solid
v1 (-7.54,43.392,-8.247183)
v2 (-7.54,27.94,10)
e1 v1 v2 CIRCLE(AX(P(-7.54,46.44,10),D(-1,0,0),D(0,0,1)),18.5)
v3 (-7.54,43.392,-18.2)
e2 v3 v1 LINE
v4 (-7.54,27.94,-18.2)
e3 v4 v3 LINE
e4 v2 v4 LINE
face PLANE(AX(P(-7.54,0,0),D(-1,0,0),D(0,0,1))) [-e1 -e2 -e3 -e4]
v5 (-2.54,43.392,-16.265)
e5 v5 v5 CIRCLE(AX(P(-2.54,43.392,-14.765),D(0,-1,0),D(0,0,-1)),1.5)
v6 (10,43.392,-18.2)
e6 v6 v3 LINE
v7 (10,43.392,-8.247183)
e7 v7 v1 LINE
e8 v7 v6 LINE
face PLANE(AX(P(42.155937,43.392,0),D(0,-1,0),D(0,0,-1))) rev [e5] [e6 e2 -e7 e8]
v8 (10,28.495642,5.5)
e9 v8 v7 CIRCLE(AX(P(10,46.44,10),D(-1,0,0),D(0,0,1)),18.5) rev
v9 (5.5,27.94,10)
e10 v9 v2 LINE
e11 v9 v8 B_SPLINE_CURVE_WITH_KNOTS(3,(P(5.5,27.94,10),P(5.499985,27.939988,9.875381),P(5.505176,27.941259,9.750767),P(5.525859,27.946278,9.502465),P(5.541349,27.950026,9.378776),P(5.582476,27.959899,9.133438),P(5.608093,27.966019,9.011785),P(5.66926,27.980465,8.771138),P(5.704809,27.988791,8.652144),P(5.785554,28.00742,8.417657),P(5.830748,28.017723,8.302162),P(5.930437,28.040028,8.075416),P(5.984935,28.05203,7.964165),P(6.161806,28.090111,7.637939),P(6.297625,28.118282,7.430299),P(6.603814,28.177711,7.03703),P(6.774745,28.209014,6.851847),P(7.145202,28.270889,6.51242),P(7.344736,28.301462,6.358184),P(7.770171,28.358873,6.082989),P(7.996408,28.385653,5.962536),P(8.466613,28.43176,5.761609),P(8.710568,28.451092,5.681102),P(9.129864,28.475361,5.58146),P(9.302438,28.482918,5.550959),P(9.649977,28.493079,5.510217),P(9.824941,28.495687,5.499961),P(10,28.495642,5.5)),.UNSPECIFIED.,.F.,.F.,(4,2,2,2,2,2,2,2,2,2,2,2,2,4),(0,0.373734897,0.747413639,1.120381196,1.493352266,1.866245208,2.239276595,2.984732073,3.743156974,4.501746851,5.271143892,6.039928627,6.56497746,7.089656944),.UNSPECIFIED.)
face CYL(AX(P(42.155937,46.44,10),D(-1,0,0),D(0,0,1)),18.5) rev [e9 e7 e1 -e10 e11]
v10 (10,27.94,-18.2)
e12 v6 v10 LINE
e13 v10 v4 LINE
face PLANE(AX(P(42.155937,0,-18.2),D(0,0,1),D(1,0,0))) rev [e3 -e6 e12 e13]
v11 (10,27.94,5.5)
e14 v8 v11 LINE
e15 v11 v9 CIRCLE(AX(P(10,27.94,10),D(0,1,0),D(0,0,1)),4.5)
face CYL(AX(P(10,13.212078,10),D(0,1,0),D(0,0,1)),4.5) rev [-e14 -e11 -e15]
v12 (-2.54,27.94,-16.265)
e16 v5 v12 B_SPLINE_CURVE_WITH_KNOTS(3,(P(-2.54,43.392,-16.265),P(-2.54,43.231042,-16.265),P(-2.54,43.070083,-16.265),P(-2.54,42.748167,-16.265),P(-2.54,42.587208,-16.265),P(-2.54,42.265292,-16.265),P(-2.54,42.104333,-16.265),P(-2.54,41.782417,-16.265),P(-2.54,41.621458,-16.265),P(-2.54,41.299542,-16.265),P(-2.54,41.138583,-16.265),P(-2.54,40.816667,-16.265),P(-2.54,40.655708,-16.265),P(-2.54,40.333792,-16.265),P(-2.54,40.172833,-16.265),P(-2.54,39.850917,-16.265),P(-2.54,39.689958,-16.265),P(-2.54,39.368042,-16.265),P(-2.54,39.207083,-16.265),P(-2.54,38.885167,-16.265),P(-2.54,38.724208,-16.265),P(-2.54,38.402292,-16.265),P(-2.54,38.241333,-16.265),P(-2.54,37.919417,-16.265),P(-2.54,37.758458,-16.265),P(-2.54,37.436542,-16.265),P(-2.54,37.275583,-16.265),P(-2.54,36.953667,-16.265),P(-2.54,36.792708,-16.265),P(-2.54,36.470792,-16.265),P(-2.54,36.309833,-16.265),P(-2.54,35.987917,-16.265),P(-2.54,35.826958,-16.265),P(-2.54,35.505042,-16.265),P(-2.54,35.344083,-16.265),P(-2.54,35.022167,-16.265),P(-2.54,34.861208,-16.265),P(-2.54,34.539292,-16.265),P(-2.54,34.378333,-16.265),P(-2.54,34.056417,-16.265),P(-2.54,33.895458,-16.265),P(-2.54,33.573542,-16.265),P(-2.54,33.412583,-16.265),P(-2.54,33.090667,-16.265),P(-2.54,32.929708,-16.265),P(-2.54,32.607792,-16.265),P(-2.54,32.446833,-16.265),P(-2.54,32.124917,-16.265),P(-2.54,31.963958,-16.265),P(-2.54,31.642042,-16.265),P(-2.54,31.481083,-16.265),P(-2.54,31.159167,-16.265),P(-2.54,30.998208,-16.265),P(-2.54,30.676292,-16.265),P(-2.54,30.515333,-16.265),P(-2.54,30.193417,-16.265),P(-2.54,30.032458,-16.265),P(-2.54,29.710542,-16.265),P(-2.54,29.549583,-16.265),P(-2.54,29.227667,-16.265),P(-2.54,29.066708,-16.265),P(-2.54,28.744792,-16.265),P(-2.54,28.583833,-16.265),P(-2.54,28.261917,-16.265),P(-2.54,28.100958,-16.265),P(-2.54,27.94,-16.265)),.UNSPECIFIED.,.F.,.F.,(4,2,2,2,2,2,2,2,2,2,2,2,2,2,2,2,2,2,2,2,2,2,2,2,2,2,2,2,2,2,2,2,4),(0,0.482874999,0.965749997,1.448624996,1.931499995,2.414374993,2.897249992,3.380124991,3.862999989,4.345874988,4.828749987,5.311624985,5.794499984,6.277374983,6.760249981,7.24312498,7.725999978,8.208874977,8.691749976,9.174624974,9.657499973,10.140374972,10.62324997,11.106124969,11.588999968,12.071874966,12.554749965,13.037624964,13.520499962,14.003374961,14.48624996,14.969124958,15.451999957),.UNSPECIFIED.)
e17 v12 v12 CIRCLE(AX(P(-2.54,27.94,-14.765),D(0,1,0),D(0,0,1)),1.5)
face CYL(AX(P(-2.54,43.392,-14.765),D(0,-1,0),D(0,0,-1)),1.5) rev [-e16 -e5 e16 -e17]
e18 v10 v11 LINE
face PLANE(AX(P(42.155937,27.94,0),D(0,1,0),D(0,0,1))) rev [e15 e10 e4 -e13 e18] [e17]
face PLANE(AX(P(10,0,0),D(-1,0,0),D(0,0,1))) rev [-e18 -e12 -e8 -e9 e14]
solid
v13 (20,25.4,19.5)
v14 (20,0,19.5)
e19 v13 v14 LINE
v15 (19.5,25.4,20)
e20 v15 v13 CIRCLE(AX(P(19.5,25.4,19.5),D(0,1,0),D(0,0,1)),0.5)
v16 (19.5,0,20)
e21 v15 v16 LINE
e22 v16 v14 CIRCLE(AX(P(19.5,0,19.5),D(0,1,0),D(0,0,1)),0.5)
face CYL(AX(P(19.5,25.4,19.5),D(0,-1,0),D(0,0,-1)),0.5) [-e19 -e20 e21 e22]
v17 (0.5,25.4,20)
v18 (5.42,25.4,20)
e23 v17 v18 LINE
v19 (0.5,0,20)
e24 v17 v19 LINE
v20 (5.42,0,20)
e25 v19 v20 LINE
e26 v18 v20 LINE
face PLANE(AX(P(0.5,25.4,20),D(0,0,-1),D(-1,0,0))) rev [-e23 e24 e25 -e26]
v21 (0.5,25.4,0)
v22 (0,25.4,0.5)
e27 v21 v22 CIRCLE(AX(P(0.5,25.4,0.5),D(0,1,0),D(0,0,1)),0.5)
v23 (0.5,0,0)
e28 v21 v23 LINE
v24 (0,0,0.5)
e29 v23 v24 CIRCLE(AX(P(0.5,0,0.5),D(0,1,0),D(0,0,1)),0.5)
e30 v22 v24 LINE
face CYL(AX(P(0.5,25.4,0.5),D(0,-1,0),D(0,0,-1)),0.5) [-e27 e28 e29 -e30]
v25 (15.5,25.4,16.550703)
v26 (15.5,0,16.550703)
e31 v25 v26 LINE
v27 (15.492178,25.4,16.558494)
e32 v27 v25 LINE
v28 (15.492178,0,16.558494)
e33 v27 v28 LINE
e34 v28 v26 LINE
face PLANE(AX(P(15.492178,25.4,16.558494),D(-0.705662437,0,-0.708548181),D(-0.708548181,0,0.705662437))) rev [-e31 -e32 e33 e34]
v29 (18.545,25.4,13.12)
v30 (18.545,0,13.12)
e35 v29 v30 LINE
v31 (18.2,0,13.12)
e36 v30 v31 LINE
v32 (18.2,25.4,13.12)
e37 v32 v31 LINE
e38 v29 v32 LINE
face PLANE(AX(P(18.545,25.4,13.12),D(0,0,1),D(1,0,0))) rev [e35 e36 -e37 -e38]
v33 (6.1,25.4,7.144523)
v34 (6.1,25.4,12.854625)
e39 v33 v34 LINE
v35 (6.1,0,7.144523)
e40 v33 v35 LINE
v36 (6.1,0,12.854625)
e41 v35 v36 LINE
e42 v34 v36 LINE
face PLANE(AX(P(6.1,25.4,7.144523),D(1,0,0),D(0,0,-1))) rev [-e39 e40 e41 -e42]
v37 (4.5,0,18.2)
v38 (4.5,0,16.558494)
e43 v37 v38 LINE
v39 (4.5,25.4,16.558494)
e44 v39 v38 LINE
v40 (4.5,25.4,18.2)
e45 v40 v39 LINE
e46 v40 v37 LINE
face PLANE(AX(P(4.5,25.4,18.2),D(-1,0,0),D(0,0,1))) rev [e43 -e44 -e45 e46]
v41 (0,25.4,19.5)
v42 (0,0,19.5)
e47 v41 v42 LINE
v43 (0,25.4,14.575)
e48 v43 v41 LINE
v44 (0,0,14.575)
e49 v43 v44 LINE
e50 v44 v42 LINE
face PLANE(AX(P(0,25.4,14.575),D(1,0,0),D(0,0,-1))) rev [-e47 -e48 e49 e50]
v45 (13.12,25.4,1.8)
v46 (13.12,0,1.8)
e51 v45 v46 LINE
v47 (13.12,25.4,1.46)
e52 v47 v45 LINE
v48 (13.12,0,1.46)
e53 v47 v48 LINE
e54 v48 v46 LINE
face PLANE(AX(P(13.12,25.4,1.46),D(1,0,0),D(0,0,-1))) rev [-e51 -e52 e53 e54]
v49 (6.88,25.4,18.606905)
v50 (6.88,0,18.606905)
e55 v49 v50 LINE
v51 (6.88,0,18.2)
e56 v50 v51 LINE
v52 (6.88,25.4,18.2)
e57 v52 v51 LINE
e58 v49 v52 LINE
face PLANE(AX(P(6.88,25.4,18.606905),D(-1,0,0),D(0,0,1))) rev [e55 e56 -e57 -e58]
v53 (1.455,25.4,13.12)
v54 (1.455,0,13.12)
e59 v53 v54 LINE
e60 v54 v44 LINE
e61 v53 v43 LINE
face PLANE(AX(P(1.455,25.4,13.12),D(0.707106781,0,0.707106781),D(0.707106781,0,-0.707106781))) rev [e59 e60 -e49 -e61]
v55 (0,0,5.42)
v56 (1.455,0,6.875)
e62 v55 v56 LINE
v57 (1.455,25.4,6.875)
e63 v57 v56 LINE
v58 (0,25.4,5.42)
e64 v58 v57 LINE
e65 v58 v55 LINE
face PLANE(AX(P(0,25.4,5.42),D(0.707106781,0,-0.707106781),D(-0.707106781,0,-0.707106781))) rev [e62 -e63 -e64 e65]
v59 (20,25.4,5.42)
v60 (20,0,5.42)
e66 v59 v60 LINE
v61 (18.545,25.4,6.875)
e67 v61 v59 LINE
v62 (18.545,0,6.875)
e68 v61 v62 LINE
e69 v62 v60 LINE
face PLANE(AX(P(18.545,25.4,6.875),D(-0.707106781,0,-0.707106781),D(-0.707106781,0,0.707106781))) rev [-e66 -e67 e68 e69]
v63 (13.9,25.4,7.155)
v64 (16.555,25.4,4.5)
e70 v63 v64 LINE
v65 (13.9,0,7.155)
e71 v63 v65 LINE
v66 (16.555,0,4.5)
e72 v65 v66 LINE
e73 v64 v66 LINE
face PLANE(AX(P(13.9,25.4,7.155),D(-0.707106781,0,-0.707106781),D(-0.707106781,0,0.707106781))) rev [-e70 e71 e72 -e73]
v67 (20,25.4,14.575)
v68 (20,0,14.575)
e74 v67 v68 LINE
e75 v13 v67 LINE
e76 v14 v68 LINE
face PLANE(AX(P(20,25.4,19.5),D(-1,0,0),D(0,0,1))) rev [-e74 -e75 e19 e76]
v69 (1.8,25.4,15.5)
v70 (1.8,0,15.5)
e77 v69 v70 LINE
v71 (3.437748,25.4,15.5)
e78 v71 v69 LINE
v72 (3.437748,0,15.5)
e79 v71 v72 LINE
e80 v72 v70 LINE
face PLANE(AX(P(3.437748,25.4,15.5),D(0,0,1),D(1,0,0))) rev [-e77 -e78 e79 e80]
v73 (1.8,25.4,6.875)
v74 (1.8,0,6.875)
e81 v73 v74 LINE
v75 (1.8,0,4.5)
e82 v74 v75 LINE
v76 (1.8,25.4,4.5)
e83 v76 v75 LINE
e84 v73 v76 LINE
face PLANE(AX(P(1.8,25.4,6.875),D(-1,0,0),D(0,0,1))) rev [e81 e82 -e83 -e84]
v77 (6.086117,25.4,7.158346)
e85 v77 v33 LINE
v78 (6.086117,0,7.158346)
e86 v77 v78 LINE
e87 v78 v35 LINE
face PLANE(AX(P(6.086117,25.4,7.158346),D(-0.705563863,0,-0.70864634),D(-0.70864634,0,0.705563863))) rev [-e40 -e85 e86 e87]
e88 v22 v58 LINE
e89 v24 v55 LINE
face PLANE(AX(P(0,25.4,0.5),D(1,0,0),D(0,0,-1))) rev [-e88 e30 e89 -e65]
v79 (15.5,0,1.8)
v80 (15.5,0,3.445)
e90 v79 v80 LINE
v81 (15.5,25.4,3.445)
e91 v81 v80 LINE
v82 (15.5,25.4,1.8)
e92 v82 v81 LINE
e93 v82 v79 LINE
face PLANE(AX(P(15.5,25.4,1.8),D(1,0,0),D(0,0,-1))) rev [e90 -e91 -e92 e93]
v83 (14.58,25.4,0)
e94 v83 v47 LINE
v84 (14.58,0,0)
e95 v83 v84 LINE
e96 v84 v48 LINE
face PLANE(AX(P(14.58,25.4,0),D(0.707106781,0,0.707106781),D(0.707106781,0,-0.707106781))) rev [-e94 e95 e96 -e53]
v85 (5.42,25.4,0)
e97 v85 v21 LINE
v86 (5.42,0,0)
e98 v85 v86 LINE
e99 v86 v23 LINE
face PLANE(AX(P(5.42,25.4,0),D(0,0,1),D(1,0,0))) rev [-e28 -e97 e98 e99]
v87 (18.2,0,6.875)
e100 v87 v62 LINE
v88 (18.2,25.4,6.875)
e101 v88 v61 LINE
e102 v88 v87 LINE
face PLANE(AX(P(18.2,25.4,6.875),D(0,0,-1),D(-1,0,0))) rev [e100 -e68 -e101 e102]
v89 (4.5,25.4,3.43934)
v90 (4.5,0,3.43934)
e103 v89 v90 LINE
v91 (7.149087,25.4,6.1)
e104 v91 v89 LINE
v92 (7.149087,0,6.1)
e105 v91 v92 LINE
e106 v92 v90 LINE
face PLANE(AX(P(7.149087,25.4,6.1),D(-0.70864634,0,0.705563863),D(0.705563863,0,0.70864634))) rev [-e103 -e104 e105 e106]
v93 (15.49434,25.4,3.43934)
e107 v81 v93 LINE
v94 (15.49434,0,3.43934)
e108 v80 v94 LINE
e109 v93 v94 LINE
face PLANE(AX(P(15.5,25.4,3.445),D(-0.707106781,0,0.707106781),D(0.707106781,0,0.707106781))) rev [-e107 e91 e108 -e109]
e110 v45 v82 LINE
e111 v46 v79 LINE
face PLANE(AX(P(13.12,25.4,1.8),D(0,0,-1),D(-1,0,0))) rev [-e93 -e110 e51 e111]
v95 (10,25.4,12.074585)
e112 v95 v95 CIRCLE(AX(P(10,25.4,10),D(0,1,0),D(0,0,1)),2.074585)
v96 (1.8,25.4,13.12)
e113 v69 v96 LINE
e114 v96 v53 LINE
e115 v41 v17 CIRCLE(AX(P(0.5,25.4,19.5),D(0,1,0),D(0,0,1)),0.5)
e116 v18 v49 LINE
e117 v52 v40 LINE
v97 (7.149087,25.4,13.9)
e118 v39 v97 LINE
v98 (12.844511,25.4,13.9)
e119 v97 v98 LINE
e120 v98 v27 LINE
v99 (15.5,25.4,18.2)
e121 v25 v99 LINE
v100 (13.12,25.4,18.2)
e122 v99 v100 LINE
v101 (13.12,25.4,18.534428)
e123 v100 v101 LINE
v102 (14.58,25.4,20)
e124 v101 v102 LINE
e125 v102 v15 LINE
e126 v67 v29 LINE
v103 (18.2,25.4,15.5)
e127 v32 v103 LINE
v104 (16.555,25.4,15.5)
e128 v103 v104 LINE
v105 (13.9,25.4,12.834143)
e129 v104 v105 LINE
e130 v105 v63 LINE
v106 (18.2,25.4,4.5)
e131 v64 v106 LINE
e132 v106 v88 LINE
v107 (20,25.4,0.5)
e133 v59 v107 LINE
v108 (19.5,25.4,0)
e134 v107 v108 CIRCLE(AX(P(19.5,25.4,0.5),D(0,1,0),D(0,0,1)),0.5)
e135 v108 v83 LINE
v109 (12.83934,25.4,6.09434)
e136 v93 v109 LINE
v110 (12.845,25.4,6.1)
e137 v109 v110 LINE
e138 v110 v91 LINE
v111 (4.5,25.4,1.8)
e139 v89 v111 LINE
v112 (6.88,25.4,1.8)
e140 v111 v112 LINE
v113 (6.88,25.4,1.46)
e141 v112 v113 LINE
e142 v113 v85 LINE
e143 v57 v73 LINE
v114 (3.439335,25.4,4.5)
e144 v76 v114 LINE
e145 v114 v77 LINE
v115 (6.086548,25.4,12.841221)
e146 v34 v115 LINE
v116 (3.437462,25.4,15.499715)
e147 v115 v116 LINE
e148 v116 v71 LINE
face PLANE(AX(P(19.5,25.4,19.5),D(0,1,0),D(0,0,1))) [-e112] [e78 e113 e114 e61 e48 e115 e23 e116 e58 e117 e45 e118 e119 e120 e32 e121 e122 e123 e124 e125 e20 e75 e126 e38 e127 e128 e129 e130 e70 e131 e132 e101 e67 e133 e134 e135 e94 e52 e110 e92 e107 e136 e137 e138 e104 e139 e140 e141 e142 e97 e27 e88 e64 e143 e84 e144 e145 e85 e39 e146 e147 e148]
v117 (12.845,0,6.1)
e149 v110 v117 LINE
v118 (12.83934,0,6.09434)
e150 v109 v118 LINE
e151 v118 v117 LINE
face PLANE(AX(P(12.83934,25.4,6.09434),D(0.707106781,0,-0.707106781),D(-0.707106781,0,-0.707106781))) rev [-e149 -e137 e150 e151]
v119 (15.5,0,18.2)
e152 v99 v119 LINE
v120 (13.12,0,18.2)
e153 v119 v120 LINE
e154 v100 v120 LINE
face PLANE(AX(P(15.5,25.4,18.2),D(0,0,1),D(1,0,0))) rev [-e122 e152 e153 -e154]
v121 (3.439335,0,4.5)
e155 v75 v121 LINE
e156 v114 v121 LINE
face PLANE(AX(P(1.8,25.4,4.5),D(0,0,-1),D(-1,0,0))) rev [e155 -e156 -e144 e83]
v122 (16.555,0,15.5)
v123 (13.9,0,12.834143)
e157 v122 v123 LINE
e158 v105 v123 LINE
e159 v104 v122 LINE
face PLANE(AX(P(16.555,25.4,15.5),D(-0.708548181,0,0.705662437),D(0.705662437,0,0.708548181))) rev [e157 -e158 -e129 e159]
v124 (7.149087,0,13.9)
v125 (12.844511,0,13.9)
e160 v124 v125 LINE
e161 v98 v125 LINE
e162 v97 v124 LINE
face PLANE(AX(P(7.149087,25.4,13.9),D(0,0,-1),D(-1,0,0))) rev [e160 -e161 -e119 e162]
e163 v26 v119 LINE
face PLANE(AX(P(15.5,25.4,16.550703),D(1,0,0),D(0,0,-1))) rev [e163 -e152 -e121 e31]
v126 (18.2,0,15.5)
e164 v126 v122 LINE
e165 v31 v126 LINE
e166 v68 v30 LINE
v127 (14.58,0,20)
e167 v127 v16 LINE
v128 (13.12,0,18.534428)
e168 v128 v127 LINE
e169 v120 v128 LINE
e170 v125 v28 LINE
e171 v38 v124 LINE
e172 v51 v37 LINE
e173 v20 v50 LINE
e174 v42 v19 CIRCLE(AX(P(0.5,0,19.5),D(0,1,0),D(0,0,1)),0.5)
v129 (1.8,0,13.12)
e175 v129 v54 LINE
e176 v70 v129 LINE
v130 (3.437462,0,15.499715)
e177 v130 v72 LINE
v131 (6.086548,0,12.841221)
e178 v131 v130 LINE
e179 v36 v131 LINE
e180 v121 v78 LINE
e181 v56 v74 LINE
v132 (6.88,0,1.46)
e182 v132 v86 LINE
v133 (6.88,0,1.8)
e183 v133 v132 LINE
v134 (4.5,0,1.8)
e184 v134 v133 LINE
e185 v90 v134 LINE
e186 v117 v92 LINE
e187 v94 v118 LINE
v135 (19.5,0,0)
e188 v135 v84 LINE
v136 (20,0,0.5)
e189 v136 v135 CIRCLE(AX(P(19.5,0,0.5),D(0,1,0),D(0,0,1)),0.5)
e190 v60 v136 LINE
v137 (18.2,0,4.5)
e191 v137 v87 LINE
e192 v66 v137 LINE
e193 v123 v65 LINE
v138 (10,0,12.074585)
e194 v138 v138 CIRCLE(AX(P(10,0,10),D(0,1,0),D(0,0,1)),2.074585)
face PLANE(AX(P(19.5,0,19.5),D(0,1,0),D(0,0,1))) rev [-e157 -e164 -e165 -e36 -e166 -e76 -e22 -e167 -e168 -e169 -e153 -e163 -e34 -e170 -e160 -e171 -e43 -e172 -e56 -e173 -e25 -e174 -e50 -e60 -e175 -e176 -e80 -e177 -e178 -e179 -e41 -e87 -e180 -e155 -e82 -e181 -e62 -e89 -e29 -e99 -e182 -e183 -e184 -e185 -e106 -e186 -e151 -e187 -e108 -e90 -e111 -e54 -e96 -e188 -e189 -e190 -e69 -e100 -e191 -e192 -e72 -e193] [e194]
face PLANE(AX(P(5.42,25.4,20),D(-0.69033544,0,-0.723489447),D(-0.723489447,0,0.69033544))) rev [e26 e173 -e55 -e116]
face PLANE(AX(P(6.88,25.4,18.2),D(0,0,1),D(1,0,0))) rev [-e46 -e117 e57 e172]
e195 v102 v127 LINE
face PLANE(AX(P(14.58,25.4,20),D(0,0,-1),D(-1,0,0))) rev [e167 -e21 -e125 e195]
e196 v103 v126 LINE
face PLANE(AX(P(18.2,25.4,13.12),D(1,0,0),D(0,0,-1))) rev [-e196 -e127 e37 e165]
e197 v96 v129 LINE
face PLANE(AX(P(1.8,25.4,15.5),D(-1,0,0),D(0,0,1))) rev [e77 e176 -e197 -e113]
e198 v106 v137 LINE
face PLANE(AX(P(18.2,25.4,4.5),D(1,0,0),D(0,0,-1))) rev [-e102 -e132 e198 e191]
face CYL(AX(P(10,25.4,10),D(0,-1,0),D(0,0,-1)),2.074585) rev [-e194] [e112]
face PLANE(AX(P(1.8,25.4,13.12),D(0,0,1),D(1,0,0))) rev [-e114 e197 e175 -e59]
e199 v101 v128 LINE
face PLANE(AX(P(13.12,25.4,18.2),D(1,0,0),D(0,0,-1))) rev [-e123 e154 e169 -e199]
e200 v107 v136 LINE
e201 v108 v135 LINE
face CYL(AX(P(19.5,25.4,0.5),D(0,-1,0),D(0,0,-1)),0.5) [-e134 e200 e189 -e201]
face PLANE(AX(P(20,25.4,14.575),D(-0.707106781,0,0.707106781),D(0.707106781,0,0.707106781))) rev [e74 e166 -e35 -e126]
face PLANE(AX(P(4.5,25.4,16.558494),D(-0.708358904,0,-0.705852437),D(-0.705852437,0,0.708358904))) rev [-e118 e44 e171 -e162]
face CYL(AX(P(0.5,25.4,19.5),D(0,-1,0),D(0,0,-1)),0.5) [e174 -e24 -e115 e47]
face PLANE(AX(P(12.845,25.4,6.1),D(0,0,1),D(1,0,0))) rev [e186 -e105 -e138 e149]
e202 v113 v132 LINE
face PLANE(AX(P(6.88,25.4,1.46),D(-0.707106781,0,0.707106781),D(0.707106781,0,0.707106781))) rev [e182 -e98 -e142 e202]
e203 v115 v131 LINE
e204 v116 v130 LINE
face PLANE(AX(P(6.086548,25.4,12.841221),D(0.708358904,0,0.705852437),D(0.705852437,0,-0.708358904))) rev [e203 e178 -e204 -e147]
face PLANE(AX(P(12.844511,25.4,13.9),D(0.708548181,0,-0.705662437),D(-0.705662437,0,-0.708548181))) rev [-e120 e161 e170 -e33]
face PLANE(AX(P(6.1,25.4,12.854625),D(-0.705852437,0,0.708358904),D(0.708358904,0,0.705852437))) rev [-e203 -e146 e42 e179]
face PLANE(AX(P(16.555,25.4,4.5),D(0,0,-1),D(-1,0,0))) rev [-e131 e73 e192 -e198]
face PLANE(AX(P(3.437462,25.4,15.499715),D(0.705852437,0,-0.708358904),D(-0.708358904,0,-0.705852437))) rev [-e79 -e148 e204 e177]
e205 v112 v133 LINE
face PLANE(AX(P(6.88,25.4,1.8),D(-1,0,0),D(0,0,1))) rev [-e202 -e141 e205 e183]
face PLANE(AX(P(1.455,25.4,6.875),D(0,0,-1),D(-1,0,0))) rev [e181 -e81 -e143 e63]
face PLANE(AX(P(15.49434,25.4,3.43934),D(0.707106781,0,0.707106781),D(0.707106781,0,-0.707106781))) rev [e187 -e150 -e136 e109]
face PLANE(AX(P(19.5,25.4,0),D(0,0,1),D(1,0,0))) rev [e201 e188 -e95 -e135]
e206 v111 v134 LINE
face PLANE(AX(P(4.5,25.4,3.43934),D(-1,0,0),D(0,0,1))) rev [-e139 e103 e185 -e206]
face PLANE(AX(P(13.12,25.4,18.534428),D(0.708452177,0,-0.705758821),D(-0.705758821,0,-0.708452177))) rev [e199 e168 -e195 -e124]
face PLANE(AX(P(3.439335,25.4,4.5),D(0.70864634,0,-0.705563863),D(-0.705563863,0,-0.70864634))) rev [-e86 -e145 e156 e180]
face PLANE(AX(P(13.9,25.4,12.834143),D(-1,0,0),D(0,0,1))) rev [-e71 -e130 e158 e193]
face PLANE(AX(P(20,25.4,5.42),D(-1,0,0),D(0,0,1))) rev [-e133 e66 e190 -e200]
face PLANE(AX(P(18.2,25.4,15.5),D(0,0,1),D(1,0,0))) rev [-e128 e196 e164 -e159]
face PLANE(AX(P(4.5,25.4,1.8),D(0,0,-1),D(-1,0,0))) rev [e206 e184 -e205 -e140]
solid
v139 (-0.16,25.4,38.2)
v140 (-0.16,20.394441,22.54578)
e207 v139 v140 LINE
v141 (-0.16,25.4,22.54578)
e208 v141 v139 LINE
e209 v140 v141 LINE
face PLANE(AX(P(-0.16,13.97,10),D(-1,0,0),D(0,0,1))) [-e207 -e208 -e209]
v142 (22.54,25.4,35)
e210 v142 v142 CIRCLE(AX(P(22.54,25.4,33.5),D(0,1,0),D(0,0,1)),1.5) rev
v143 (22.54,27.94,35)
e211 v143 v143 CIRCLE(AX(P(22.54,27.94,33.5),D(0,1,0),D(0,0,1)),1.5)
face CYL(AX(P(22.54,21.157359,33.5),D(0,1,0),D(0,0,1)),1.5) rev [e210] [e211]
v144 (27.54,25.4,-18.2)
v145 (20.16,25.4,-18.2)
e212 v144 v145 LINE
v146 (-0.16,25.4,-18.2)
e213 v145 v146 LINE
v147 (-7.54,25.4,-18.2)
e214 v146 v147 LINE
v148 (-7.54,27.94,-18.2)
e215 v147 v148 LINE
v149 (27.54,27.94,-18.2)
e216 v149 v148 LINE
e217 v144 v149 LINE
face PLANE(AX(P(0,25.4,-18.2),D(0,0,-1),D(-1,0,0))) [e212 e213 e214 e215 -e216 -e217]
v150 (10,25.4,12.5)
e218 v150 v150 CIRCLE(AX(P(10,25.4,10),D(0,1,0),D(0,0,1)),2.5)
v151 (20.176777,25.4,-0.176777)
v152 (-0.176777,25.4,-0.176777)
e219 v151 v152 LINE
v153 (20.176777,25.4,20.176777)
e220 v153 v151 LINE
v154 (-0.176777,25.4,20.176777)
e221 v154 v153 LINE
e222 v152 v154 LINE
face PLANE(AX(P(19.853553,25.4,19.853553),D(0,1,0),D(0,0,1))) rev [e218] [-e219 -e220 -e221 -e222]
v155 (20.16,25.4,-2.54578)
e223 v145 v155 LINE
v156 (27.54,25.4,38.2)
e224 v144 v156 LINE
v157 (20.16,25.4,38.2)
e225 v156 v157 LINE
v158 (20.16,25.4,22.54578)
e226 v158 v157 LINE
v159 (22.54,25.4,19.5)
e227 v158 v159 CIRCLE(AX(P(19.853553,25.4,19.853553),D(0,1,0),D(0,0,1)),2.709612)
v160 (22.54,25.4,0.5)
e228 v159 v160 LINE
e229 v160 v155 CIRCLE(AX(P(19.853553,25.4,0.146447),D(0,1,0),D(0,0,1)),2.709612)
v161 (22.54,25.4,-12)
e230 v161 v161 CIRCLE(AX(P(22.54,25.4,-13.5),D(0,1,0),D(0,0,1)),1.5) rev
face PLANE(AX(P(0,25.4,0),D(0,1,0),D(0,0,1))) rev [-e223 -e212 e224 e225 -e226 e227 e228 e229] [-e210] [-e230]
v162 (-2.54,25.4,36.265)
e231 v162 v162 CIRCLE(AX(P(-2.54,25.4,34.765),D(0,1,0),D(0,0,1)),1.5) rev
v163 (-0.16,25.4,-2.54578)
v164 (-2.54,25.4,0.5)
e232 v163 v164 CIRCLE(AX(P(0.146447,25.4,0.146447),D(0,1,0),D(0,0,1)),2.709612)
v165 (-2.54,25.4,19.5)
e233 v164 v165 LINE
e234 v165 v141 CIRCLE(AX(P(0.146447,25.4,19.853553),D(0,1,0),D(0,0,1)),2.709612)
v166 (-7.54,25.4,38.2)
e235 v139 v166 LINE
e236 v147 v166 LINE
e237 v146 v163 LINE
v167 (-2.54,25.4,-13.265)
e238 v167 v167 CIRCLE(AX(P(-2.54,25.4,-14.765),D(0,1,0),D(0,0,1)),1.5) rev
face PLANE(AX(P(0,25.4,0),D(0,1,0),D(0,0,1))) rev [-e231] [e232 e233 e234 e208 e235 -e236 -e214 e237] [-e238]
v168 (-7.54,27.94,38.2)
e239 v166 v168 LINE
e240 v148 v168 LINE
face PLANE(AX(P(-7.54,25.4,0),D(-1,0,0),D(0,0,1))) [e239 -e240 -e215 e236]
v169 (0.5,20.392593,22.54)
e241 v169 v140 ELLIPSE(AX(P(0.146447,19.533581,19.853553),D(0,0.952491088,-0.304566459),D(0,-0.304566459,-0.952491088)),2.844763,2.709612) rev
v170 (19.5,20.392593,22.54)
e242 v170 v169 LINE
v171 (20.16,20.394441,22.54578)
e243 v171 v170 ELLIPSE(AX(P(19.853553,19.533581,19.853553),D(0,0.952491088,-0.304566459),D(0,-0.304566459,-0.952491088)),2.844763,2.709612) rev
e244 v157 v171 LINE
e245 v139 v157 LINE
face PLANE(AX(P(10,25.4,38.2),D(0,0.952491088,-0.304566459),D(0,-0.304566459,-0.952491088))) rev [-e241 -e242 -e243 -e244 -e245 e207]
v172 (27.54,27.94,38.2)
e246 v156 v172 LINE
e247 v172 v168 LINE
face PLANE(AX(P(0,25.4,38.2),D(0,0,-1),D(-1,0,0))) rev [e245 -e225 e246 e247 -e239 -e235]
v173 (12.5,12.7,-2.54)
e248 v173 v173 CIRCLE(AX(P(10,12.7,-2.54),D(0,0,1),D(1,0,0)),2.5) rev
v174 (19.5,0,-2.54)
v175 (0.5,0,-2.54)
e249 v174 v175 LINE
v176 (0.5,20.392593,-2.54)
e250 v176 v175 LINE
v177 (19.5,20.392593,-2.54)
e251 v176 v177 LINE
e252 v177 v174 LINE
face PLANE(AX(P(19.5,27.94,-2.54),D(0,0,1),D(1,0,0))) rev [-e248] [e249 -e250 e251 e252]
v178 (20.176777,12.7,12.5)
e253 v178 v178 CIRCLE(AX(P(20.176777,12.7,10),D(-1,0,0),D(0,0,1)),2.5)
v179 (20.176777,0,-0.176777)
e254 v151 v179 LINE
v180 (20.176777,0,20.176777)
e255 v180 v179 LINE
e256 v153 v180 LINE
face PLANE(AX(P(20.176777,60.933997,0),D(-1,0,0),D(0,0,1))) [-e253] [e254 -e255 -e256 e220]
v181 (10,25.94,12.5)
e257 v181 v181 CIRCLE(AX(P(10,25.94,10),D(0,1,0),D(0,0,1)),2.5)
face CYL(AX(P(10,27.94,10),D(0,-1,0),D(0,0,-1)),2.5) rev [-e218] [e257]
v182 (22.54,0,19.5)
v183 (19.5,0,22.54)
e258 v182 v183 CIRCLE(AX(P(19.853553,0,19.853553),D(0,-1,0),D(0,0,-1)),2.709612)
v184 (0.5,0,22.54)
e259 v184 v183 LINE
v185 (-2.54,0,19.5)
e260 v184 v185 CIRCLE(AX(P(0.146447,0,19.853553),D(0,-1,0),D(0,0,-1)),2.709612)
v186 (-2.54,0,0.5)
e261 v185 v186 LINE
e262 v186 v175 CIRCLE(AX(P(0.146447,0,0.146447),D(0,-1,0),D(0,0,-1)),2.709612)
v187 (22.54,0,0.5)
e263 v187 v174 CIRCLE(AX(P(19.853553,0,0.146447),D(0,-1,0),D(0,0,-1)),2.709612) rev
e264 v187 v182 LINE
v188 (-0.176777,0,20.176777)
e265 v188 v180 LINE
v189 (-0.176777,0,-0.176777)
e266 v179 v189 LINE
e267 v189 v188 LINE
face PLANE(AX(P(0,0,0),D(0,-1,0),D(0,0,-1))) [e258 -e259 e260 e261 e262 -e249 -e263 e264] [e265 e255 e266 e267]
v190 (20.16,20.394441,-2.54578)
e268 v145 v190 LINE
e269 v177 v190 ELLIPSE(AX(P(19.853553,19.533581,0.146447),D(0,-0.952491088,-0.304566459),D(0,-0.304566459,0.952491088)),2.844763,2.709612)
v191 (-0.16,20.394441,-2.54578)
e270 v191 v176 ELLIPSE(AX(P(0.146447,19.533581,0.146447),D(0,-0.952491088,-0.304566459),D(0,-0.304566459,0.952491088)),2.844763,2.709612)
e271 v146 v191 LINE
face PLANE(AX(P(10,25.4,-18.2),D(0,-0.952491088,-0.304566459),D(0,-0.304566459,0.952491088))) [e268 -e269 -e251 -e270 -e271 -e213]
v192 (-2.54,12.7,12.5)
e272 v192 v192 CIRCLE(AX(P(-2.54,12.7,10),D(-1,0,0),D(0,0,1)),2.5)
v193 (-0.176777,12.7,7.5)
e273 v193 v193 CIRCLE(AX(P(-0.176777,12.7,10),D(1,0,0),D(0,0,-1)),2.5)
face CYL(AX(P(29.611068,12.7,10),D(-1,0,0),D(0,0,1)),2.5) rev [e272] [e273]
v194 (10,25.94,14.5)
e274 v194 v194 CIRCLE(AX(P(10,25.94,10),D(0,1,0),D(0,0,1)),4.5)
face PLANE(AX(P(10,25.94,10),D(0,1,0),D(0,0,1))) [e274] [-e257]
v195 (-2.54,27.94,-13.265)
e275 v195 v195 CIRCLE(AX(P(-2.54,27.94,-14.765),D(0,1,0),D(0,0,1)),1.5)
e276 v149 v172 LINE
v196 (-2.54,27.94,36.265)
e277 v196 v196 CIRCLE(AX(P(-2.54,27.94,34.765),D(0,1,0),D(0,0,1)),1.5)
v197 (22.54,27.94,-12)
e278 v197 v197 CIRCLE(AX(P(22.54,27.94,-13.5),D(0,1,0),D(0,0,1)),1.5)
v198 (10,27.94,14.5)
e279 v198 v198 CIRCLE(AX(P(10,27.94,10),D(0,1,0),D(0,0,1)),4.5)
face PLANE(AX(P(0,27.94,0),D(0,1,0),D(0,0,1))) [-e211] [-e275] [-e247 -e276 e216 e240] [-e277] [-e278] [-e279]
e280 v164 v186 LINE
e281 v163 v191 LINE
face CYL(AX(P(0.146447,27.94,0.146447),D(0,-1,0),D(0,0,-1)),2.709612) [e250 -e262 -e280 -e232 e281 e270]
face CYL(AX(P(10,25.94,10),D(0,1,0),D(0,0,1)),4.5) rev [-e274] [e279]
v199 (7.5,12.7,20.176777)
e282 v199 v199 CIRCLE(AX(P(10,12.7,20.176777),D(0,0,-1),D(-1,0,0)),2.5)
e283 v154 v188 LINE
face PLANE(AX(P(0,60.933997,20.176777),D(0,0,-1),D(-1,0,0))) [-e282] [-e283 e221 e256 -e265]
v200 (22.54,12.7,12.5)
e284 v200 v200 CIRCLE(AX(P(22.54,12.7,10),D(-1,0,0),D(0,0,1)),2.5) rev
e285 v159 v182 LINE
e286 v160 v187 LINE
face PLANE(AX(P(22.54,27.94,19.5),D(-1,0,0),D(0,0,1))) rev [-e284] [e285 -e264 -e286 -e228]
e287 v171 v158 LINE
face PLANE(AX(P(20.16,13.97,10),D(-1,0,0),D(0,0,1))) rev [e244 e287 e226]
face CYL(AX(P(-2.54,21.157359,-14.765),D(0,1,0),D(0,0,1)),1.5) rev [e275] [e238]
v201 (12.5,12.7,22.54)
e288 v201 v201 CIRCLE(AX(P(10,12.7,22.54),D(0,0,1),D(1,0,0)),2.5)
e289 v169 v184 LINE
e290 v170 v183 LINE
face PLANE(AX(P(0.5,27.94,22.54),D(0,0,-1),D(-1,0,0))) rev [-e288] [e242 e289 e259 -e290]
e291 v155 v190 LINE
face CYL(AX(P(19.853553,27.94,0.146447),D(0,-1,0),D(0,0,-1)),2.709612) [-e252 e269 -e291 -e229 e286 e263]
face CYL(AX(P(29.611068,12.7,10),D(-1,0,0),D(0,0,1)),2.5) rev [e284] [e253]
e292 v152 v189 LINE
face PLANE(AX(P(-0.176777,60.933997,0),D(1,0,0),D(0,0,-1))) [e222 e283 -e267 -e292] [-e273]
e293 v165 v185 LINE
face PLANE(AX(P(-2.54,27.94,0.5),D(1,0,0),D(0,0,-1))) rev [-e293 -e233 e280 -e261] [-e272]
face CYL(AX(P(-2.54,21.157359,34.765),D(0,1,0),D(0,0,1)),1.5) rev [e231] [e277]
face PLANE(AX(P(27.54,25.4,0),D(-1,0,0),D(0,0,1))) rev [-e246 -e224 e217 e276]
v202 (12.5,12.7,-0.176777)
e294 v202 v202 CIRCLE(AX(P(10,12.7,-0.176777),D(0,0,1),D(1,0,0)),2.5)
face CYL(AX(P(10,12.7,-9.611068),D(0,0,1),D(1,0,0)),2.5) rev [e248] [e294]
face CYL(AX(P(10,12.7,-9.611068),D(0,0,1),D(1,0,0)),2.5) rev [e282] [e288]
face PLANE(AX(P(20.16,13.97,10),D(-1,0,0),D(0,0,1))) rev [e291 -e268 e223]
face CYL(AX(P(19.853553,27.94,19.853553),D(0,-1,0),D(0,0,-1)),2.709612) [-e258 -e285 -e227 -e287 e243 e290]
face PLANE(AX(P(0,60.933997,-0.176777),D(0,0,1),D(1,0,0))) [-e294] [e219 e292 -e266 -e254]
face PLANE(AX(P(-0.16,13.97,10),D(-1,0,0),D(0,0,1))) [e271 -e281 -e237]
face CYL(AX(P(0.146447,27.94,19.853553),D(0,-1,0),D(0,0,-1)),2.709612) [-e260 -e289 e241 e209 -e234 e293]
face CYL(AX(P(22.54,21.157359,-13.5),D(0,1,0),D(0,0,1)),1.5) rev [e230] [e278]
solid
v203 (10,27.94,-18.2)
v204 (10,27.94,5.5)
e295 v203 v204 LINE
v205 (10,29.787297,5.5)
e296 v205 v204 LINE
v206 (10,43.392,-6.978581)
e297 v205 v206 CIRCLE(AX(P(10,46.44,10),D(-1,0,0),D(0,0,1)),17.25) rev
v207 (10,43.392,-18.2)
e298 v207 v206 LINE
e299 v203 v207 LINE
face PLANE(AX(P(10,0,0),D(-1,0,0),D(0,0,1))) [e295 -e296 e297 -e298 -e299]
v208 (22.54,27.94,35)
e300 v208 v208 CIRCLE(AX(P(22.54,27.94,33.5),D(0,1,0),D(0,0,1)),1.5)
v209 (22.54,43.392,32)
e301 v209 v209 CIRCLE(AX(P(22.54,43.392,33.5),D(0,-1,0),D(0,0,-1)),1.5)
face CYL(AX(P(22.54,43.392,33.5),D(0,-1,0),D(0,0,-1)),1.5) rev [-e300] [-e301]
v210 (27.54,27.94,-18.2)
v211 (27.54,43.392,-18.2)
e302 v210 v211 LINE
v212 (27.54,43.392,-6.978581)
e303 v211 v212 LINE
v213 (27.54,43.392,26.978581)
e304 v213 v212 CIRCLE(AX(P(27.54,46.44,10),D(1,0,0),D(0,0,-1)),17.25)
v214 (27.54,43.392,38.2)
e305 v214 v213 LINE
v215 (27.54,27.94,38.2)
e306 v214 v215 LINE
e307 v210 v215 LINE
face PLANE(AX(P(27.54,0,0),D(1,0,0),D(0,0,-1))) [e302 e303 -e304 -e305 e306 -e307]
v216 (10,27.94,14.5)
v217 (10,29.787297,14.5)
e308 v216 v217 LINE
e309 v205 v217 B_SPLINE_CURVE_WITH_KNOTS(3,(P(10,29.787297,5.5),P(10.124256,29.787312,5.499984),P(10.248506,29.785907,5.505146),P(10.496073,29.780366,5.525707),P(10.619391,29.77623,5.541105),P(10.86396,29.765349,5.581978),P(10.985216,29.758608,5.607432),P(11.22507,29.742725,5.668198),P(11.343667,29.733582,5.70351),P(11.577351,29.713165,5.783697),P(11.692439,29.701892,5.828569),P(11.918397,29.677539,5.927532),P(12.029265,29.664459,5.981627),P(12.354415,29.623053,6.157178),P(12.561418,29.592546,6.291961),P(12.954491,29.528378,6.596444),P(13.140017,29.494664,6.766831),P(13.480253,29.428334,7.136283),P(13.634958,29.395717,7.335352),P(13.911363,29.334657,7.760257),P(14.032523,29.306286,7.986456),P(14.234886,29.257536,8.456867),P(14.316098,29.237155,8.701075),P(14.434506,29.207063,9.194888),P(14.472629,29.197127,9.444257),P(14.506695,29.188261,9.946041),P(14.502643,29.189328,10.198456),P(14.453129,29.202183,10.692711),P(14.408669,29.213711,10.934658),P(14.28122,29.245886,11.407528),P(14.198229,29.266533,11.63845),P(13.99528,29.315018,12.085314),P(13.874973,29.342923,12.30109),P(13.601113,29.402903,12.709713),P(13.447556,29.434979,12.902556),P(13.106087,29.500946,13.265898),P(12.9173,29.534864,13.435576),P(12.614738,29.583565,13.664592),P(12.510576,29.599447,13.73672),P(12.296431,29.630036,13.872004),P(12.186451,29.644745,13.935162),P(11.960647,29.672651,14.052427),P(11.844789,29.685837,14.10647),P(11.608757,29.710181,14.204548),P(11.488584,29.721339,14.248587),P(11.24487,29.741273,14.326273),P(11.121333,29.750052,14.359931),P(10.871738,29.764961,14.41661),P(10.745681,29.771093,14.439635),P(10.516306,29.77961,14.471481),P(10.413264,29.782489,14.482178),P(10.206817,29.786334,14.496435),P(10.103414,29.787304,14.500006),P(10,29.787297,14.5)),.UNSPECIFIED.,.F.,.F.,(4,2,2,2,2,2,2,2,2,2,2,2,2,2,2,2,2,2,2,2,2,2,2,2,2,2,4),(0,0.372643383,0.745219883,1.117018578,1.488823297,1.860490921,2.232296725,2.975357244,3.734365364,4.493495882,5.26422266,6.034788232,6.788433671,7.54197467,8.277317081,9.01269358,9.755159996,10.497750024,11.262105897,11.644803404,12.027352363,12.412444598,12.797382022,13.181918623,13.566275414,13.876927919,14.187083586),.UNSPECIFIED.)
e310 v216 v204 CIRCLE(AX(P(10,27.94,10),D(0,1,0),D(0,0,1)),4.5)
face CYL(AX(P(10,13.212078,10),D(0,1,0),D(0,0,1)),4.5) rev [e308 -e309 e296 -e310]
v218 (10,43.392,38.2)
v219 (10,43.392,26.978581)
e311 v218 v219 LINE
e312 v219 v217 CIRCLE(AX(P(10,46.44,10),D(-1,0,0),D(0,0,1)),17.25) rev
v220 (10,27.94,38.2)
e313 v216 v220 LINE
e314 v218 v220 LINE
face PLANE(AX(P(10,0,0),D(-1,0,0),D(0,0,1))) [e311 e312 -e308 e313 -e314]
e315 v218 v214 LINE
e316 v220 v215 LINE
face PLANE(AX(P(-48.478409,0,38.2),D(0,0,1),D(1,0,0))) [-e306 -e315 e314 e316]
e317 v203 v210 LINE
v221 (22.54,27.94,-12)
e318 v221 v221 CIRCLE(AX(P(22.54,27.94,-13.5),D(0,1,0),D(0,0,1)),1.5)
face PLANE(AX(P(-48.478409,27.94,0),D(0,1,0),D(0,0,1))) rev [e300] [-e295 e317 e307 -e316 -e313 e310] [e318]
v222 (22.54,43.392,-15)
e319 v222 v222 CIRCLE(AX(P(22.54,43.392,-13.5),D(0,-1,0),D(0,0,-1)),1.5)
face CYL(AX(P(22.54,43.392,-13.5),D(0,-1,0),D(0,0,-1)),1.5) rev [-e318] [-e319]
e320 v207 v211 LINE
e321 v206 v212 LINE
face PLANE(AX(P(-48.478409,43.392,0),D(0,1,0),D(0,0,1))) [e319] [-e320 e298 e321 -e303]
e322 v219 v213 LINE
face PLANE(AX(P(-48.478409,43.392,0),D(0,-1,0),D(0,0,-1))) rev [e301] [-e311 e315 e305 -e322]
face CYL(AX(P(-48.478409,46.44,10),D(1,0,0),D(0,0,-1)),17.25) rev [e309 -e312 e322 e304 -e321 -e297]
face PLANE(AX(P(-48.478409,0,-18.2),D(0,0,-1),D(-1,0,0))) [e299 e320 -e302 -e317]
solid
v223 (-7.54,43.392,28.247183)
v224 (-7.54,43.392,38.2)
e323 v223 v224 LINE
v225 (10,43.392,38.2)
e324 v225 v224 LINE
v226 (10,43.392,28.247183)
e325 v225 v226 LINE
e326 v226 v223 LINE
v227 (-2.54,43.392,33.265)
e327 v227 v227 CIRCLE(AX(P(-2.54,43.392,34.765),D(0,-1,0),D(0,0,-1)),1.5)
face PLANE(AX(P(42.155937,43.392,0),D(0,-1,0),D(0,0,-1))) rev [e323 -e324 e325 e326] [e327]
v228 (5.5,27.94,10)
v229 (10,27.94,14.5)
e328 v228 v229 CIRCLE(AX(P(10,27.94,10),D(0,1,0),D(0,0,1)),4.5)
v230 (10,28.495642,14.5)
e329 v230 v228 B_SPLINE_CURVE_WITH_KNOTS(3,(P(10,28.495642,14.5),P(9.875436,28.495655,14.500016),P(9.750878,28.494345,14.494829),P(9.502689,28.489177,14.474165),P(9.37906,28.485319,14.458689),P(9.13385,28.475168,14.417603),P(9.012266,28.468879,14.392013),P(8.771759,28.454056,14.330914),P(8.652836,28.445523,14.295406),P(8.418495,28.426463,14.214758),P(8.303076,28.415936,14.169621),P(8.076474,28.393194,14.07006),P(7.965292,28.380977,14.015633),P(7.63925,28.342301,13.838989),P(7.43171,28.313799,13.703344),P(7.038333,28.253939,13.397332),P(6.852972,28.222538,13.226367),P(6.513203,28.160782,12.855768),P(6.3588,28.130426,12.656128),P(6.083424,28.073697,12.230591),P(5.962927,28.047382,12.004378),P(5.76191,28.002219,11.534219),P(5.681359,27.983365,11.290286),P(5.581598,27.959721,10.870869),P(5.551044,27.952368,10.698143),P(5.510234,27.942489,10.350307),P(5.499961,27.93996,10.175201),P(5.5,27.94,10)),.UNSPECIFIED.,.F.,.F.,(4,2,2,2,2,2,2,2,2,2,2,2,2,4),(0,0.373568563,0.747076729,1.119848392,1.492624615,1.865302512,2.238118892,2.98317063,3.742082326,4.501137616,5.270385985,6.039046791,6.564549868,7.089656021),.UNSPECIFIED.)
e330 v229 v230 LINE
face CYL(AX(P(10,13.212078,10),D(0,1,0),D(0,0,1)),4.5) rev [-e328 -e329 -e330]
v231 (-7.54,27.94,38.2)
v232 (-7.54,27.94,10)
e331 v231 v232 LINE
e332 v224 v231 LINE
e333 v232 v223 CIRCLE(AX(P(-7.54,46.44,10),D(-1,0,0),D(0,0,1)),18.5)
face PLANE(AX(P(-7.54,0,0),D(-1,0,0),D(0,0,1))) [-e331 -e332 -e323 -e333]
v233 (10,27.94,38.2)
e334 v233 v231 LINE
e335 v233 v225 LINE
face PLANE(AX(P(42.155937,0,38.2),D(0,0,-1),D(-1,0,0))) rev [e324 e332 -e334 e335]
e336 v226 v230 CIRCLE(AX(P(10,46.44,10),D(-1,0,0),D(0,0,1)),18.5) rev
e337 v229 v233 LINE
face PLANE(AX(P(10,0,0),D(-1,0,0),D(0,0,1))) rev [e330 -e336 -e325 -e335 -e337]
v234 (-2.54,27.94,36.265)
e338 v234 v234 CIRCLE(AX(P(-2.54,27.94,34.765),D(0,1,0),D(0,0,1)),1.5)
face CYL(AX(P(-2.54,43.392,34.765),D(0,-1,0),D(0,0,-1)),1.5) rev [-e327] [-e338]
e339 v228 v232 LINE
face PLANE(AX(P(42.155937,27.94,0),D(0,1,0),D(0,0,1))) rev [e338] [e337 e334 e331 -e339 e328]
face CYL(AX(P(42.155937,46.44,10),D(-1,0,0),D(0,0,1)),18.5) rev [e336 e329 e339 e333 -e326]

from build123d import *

# Parameters (mm, degrees)
SKETCH2_R               = 2.074585303
VSLOT2020_2020_5_DEPTH  = 25.4
BOSS_EXTRUDE1_START     = -25.4
SKETCH3_W               = 20.35355339
SKETCH3_H               = 20.35355339
BOSS_EXTRUDE1_DEPTH     = 25.4
CUT_EXTRUDE1_REACH      = 44.242
SKETCH5_R               = 2.5
SKETCH10_R              = 2.5
BOSS_EXTRUDE2_DEPTH     = 2.54
BOSS_EXTRUDE3_DEPTH     = 2.54
RIB22_REACH             = 52.473
SKETCH15_WALL_W         = 119.363005456
SKETCH15_WALL_H         = 20.32
SKETCH16_R              = 1.5
CUT_EXTRUDE3_DEPTH      = 2.54
SKETCH17_R              = 4.5
CUT_EXTRUDE4_DEPTH      = 2
CUT_EXTRUDE2_REACH      = 58.078
BOSS_EXTRUDE6_DEPTH     = 17.54
BOSS_EXTRUDE6_2_DEPTH   = 17.54
BOSS_EXTRUDE7_DEPTH     = 17.54
CUT_EXTRUDE7_DEPTH      = 54.505622126
CUT_EXTRUDE7_DEPTH_BACK = 54.505622126
SKETCH27_R              = 2.5
SKETCH27_R_2            = 1.5
CUT_EXTRUDE8_DEPTH      = 65.035593734
CUT_EXTRUDE8_DEPTH_BACK = 17.452
SKETCH28_R              = 4.5


with BuildPart() as part:
    # Sketch2 → Vslot2020 2020(5) (new body)
    with BuildSketch(Plane.ZX):
        with BuildLine():
            Line((13.9, 7.149086807), (13.9, 12.844511469))
            Line((13.9, 12.844511469), (16.558493656, 15.492177728))
            Line((16.558493656, 15.492177728), (16.550703242, 15.5))
            Line((16.550703242, 15.5), (18.2, 15.5))
            Line((18.2, 15.5), (18.2, 13.12))
            Line((18.2, 13.12), (18.534428266, 13.12))
            Line((18.534428266, 13.12), (20, 14.58))
            Line((20, 14.58), (20, 19.5))
            ThreePointArc((20, 19.5), (19.853553391, 19.853553391), (19.5, 20))
            Line((19.5, 20), (14.575, 20))
            Line((14.575, 20), (13.12, 18.545))
            Line((13.12, 18.545), (13.12, 18.2))
            Line((13.12, 18.2), (15.5, 18.2))
            Line((15.5, 18.2), (15.5, 16.555))
            Line((15.5, 16.555), (12.834142613, 13.9))
            Line((12.834142613, 13.9), (7.155, 13.9))
            Line((7.155, 13.9), (4.5, 16.555))
            Line((4.5, 16.555), (4.5, 18.2))
            Line((4.5, 18.2), (6.875, 18.2))
            Line((6.875, 18.2), (6.875, 18.545))
            Line((6.875, 18.545), (5.42, 20))
            Line((5.42, 20), (0.5, 20))
            ThreePointArc((0.5, 20), (0.146446609, 19.853553391), (0, 19.5))
            Line((0, 19.5), (0, 14.58))
            Line((0, 14.58), (1.46, 13.12))
            Line((1.46, 13.12), (1.8, 13.12))
            Line((1.8, 13.12), (1.8, 15.5))
            Line((1.8, 15.5), (3.445, 15.5))
            Line((3.445, 15.5), (3.439339828, 15.494339828))
            Line((3.439339828, 15.494339828), (6.094339828, 12.839339828))
            Line((6.094339828, 12.839339828), (6.1, 12.845))
            Line((6.1, 12.845), (6.1, 7.149086807))
            Line((6.1, 7.149086807), (3.439339828, 4.5))
            Line((3.439339828, 4.5), (1.8, 4.5))
            Line((1.8, 4.5), (1.8, 6.88))
            Line((1.8, 6.88), (1.46, 6.88))
            Line((1.46, 6.88), (0, 5.42))
            Line((0, 5.42), (0, 0.5))
            ThreePointArc((0, 0.5), (0.146446609, 0.146446609), (0.5, 0))
            Line((0.5, 0), (5.42, 0))
            Line((5.42, 0), (6.875, 1.455))
            Line((6.875, 1.455), (6.875, 1.8))
            Line((6.875, 1.8), (4.5, 1.8))
            Line((4.5, 1.8), (4.5, 3.4393348))
            Line((4.5, 3.4393348), (7.158345795, 6.086117297))
            Line((7.158345795, 6.086117297), (7.144523479, 6.1))
            Line((7.144523479, 6.1), (12.854625295, 6.1))
            Line((12.854625295, 6.1), (12.841221344, 6.086548451))
            Line((12.841221344, 6.086548451), (15.499715, 3.437461644))
            Line((15.499715, 3.437461644), (15.5, 1.8))
            Line((15.5, 1.8), (13.12, 1.8))
            Line((13.12, 1.8), (13.12, 1.455))
            Line((13.12, 1.455), (14.575, 0))
            Line((14.575, 0), (19.5, 0))
            ThreePointArc((19.5, 0), (19.853553391, 0.146446609), (20, 0.5))
            Line((20, 0.5), (20, 5.42))
            Line((20, 5.42), (18.606904708, 6.88))
            Line((18.606904708, 6.88), (18.2, 6.88))
            Line((18.2, 6.88), (18.2, 4.5))
            Line((18.2, 4.5), (16.558493656, 4.5))
            Line((16.558493656, 4.5), (13.9, 7.149086807))
        make_face()
        with Locations((10, 10)):
            Circle(SKETCH2_R, mode=Mode.SUBTRACT)
    extrude(amount=VSLOT2020_2020_5_DEPTH)


with BuildPart() as body_2:
    # Sketch3 → Boss-Extrude1 (new body)
    with BuildSketch(Plane.XZ.offset(BOSS_EXTRUDE1_START)):
        with BuildLine():
            Line((22.54, 0.5), (22.54, 19.5))
            ThreePointArc((22.54, 19.5), (21.769538175, 21.769538175), (19.5, 22.54))
            Line((19.5, 22.54), (0.5, 22.54))
            ThreePointArc((0.5, 22.54), (-1.769538175, 21.769538175), (-2.54, 19.5))
            Line((-2.54, 19.5), (-2.54, 0.5))
            ThreePointArc((-2.54, 0.5), (-1.769538175, -1.769538175), (0.5, -2.54))
            Line((0.5, -2.54), (19.5, -2.54))
            ThreePointArc((19.5, -2.54), (21.769538175, -1.769538175), (22.54, 0.5))
        make_face()
        with Locations((10, 10)):
            Rectangle(SKETCH3_W, SKETCH3_H, mode=Mode.SUBTRACT)
    extrude(amount=BOSS_EXTRUDE1_DEPTH)

    # Cut-Extrude1: up to this face of the body (flat: up to its plane)
    cut_extrude1_end = Plane(body_2.part.faces().sort_by_distance((10, 12.7, -2.54))[0])
    # Sketch5 → Cut-Extrude1 (cut, up to the picked face)
    with BuildSketch(Plane.XY.offset(22.54), mode=Mode.PRIVATE) as cut_extrude1_sk1:
        with Locations((10, 12.7)):
            Circle(SKETCH5_R)
    cut_extrude1_tool1 = split(extrude(cut_extrude1_sk1.sketch, amount=-CUT_EXTRUDE1_REACH, mode=Mode.PRIVATE), bisect_by=cut_extrude1_end, keep=Keep.BOTH, mode=Mode.PRIVATE)
    add(cut_extrude1_tool1.solids().sort_by(Axis((10, 12.7, 22.54), (0, 0, -1)))[0], mode=Mode.SUBTRACT)


with BuildPart() as body_3:
    # Sketch10 → Boss-Extrude2 (new body)
    with BuildSketch(Plane(origin=(0, 25.4, 0), x_dir=(1, 0, 0), z_dir=(0, 1, 0))):
        with BuildLine():
            Line((22.54, -19.5), (22.54, -0.5))
            ThreePointArc((22.54, -0.5), (21.769538175, 1.769538175), (19.5, 2.54))
            Line((19.5, 2.54), (0.5, 2.54))
            ThreePointArc((0.5, 2.54), (-1.769538175, 1.769538175), (-2.54, -0.5))
            Line((-2.54, -0.5), (-2.54, -19.5))
            ThreePointArc((-2.54, -19.5), (-1.769538175, -21.769538175), (0.5, -22.54))
            Line((0.5, -22.54), (19.5, -22.54))
            ThreePointArc((19.5, -22.54), (21.769538175, -21.769538175), (22.54, -19.5))
        make_face()
        with Locations(Location((10, -10, 0), (0, 0, 270))):
            Circle(SKETCH10_R, mode=Mode.SUBTRACT)
    extrude(amount=BOSS_EXTRUDE2_DEPTH)


with BuildPart() as body_4:
    # Sketch12 → Boss-Extrude3 (new body)
    with BuildSketch(Plane(origin=(0, 27.94, 0), x_dir=(1, 0, 0), z_dir=(0, 1, 0))):
        with BuildLine():
            Line((-7.54, -38.199999988), (-2.54, -38.199999988))
            Line((-2.54, -38.199999988), (-2.54, -20.207106781))
            ThreePointArc((-2.54, -20.207106781), (-2.563165057, -19.853553391), (-2.54, -19.5))
            Line((-2.54, -19.5), (-2.54, -0.5))
            ThreePointArc((-2.54, -0.5), (-2.563165057, -0.146446609), (-2.54, 0.207106781))
            Line((-2.54, 0.207106781), (-2.54, 18.199999988))
            Line((-2.54, 18.199999988), (-7.54, 18.199999988))
            Line((-7.54, 18.199999988), (-7.54, -38.199999988))
        make_face()
        with BuildLine():
            Line((22.54, -0.5), (22.54, -19.5))
            ThreePointArc((22.54, -19.5), (22.563165057, -19.853553391), (22.54, -20.207106781))
            Line((22.54, -20.207106781), (22.54, -38.199999988))
            Line((22.54, -38.199999988), (27.54, -38.199999988))
            Line((27.54, -38.199999988), (27.54, 18.199999988))
            Line((27.54, 18.199999988), (22.54, 18.199999988))
            Line((22.54, 18.199999988), (22.54, 0.207106781))
            ThreePointArc((22.54, 0.207106781), (22.563165057, -0.146446609), (22.54, -0.5))
        make_face()
        with BuildLine():
            ThreePointArc((19.5, 2.54), (21.503158005, 2.003158005), (22.54, 0.207106781))
            Line((22.54, 0.207106781), (22.54, 18.199999988))
            Line((22.54, 18.199999988), (-2.54, 18.199999988))
            Line((-2.54, 18.199999988), (-2.54, 0.207106781))
            ThreePointArc((-2.54, 0.207106781), (-1.503158005, 2.003158005), (0.5, 2.54))
            Line((0.5, 2.54), (19.5, 2.54))
        make_face()
        with BuildLine():
            Line((22.54, -38.199999988), (22.54, -20.207106781))
            ThreePointArc((22.54, -20.207106781), (21.503158005, -22.003158005), (19.5, -22.54))
            Line((19.5, -22.54), (0.5, -22.54))
            ThreePointArc((0.5, -22.54), (-1.503158005, -22.003158005), (-2.54, -20.207106781))
            Line((-2.54, -20.207106781), (-2.54, -38.199999988))
            Line((-2.54, -38.199999988), (22.54, -38.199999988))
        make_face()
    extrude(amount=-BOSS_EXTRUDE3_DEPTH)

    # Combine1: union body 3, body 2
    add(body_3.part)
    add(body_2.part)

    # Sketch15 wall → Rib22 (add, up to next)
    with BuildSketch(Plane(origin=(10, 22.9, -10.381582522), x_dir=(0, -0.304566458614, 0.952491087773), z_dir=(0, 0.952491087773, 0.304566458614)), mode=Mode.PRIVATE) as rib22_sk1:
        Rectangle(SKETCH15_WALL_W, SKETCH15_WALL_H)
    rib22_tool1 = extrude(rib22_sk1.sketch, amount=RIB22_REACH, mode=Mode.PRIVATE) - body_4.part
    rib22 = rib22_tool1.solids().sort_by_distance((10, 22.9, -10.381582522))[0]
    add(rib22)

    # Mirror5: Rib22 across plane
    add(rib22.mirror(Plane.XY.offset(10)))

    # Sketch16 → Cut-Extrude3 (cut)
    with BuildSketch(Plane(origin=(0, 27.94, 0), x_dir=(1, 0, 0), z_dir=(0, 1, 0))):
        with Locations(Location((-2.54, 14.765, 0), (0, 0, 270))):
            Circle(SKETCH16_R)
        with Locations(Location((22.54, 13.49999999, 0), (0, 0, 270))):
            Circle(SKETCH16_R)
        with Locations(Location((-2.54, -34.765, 0), (0, 0, 270))):
            Circle(SKETCH16_R)
        with Locations(Location((22.54, -33.49999999, 0), (0, 0, 270))):
            Circle(SKETCH16_R)
    extrude(amount=-CUT_EXTRUDE3_DEPTH, mode=Mode.SUBTRACT)

    # Sketch17 → Cut-Extrude4 (cut)
    with BuildSketch(Plane(origin=(0, 27.94, 0), x_dir=(1, 0, 0), z_dir=(0, 1, 0))):
        with Locations(Location((10, -10, 0), (0, 0, 270))):
            Circle(SKETCH17_R)
    extrude(amount=-CUT_EXTRUDE4_DEPTH, mode=Mode.SUBTRACT)

    # Cut-Extrude2: up to this face of the body (flat: up to its plane)
    cut_extrude2_end = Plane(body_4.part.faces().sort_by_distance((22.54, 12.7, 10))[0])
    # Sketch6 → Cut-Extrude2 (cut, up to the picked face)
    with BuildSketch(Plane.ZY.offset(2.54), mode=Mode.PRIVATE) as cut_extrude2_sk1:
        with BuildLine():
            ThreePointArc((12.5, 12.7), (11.767766953, 14.467766953), (10, 15.2))
            Line((10, 15.2), (10, 10.2))
            ThreePointArc((10, 10.2), (11.767766953, 10.932233047), (12.5, 12.7))
        make_face()
    cut_extrude2_tool1 = split(extrude(cut_extrude2_sk1.sketch, amount=-CUT_EXTRUDE2_REACH, mode=Mode.PRIVATE), bisect_by=cut_extrude2_end, keep=Keep.BOTH, mode=Mode.PRIVATE)
    # Sketch6 → Cut-Extrude2 (cut, up to the picked face)
    with BuildSketch(Plane.ZY.offset(2.54), mode=Mode.PRIVATE) as cut_extrude2_sk2:
        with BuildLine():
            Line((10, 10.2), (10, 15.2))
            ThreePointArc((10, 15.2), (7.5, 12.7), (10, 10.2))
        make_face()
    cut_extrude2_tool2 = split(extrude(cut_extrude2_sk2.sketch, amount=-CUT_EXTRUDE2_REACH, mode=Mode.PRIVATE), bisect_by=cut_extrude2_end, keep=Keep.BOTH, mode=Mode.PRIVATE)
    # Sketch6 → Cut-Extrude2 (cut, up to the picked face)
    with BuildSketch(Plane.ZY.offset(2.54), mode=Mode.PRIVATE) as cut_extrude2_sk3:
        with BuildLine():
            ThreePointArc((12.5, 12.7), (11.767766953, 14.467766953), (10, 15.2))
            Line((10, 15.2), (10, 10.2))
            ThreePointArc((10, 10.2), (11.767766953, 10.932233047), (12.5, 12.7))
        make_face()
    cut_extrude2_tool3 = split(extrude(cut_extrude2_sk3.sketch, amount=-CUT_EXTRUDE2_REACH, mode=Mode.PRIVATE), bisect_by=cut_extrude2_end, keep=Keep.BOTH, mode=Mode.PRIVATE)
    # Sketch6 → Cut-Extrude2 (cut, up to the picked face)
    with BuildSketch(Plane.ZY.offset(2.54), mode=Mode.PRIVATE) as cut_extrude2_sk4:
        with BuildLine():
            Line((10, 10.2), (10, 15.2))
            ThreePointArc((10, 15.2), (7.5, 12.7), (10, 10.2))
        make_face()
    cut_extrude2_tool4 = split(extrude(cut_extrude2_sk4.sketch, amount=-CUT_EXTRUDE2_REACH, mode=Mode.PRIVATE), bisect_by=cut_extrude2_end, keep=Keep.BOTH, mode=Mode.PRIVATE)
    add(cut_extrude2_tool1.solids().sort_by(Axis((-2.54, 12.7, 11.061033), (1, 0, 0)))[0], mode=Mode.SUBTRACT)
    add(cut_extrude2_tool2.solids().sort_by(Axis((-2.54, 12.7, 8.938967), (1, 0, 0)))[0], mode=Mode.SUBTRACT)
    add(cut_extrude2_tool3.solids().sort_by(Axis((-2.54, 12.7, 11.061033), (1, 0, 0)))[0], mode=Mode.SUBTRACT)
    add(cut_extrude2_tool4.solids().sort_by(Axis((-2.54, 12.7, 8.938967), (1, 0, 0)))[0], mode=Mode.SUBTRACT)


with BuildPart() as body_3_2:
    # Sketch23 → Boss-Extrude6 (new body)
    with BuildSketch(Plane.ZY.offset(7.54)):
        with BuildLine():
            Line((-18.199999988, 43.391999957), (-18.199999988, 27.94))
            Line((-18.199999988, 27.94), (10, 27.94))
            ThreePointArc((10, 27.94), (-1.95537533, 32.32196188), (-8.247183191, 43.391999957))
            Line((-8.247183191, 43.391999957), (-18.199999988, 43.391999957))
        make_face()
    extrude(amount=-BOSS_EXTRUDE6_DEPTH)


with BuildPart() as body_4_2:
    # Sketch23 → Boss-Extrude6 2 (new body)
    with BuildSketch(Plane.ZY.offset(7.54)):
        with BuildLine():
            ThreePointArc((28.247183191, 43.391999957), (21.95537533, 32.32196188), (10, 27.94))
            Line((10, 27.94), (38.199999988, 27.94))
            Line((38.199999988, 27.94), (38.199999988, 43.391999957))
            Line((38.199999988, 43.391999957), (28.247183191, 43.391999957))
        make_face()
    extrude(amount=-BOSS_EXTRUDE6_2_DEPTH)


with BuildPart() as body_5:
    # Sketch24 → Boss-Extrude7 (new body)
    with BuildSketch(Plane(origin=(27.54, 0, 0), x_dir=(0, 0, -1), z_dir=(1, 0, 0))):
        with BuildLine():
            Line((-28.247183191, 43.391999957), (-38.199999988, 43.391999957))
            Line((-38.199999988, 43.391999957), (-38.199999988, 27.94))
            Line((-38.199999988, 27.94), (18.199999988, 27.94))
            Line((18.199999988, 27.94), (18.199999988, 43.391999957))
            Line((18.199999988, 43.391999957), (8.247183191, 43.391999957))
            Line((8.247183191, 43.391999957), (6.978580551, 43.391999957))
            ThreePointArc((6.978580551, 43.391999957), (-10, 29.189999913), (-26.978580551, 43.391999957))
            Line((-26.978580551, 43.391999957), (-28.247183191, 43.391999957))
        make_face()
    extrude(amount=-BOSS_EXTRUDE7_DEPTH)


with BuildPart() as cut_extrude7_tool:
    # Sketch27 → Cut-Extrude7 (new, two sides: drawn at the far end of the back side and taken through both)
    with BuildSketch(Plane.XZ.offset(-25.4).offset(-CUT_EXTRUDE7_DEPTH_BACK)):
        with Locations(Location((10, 10, 0), (0, 0, 90))):
            Circle(SKETCH27_R)
        with Locations(Location((-2.54, 34.765, 0), (0, 0, 270))):
            Circle(SKETCH27_R_2)
        with Locations(Location((-2.54, -14.765, 0), (0, 0, 270))):
            Circle(SKETCH27_R_2)
        with Locations(Location((22.54, -13.49999999, 0), (0, 0, 270))):
            Circle(SKETCH27_R_2)
        with Locations(Location((22.54, 33.49999999, 0), (0, 0, 270))):
            Circle(SKETCH27_R_2)
    extrude(amount=CUT_EXTRUDE7_DEPTH + CUT_EXTRUDE7_DEPTH_BACK)


with BuildPart() as body_3_2_1:
    add(body_3_2.part)

    # Cut-Extrude7: cut by cut_extrude7_tool
    add(cut_extrude7_tool.part, mode=Mode.SUBTRACT)


with BuildPart() as body_4_2_1:
    add(body_4_2.part)

    # Cut-Extrude7: cut by cut_extrude7_tool
    add(cut_extrude7_tool.part, mode=Mode.SUBTRACT)


with BuildPart() as body_5_1:
    add(body_5.part)

    # Cut-Extrude7: cut by cut_extrude7_tool
    add(cut_extrude7_tool.part, mode=Mode.SUBTRACT)


with BuildPart() as cut_extrude8_tool:
    # Sketch28 → Cut-Extrude8 (new, two sides: drawn at the far end of the back side and taken through both)
    with BuildSketch(Plane(origin=(0, 43.391999957, 0), x_dir=(1, 0, 0), z_dir=(0, 1, 0)).offset(-CUT_EXTRUDE8_DEPTH_BACK)):
        with Locations(Location((10, -10, 0), (0, 0, 270))):
            Circle(SKETCH28_R)
    extrude(amount=CUT_EXTRUDE8_DEPTH + CUT_EXTRUDE8_DEPTH_BACK)


with BuildPart() as body_3_2_2:
    add(body_3_2_1.part)

    # Cut-Extrude8: cut by cut_extrude8_tool
    add(cut_extrude8_tool.part, mode=Mode.SUBTRACT)


with BuildPart() as body_4_2_2:
    add(body_4_2_1.part)

    # Cut-Extrude8: cut by cut_extrude8_tool
    add(cut_extrude8_tool.part, mode=Mode.SUBTRACT)


with BuildPart() as body_5_2:
    add(body_5_1.part)

    # Cut-Extrude8: cut by cut_extrude8_tool
    add(cut_extrude8_tool.part, mode=Mode.SUBTRACT)


solid = Compound([part.part, body_4.part, body_3_2_2.part, body_4_2_2.part, body_5_2.part])
